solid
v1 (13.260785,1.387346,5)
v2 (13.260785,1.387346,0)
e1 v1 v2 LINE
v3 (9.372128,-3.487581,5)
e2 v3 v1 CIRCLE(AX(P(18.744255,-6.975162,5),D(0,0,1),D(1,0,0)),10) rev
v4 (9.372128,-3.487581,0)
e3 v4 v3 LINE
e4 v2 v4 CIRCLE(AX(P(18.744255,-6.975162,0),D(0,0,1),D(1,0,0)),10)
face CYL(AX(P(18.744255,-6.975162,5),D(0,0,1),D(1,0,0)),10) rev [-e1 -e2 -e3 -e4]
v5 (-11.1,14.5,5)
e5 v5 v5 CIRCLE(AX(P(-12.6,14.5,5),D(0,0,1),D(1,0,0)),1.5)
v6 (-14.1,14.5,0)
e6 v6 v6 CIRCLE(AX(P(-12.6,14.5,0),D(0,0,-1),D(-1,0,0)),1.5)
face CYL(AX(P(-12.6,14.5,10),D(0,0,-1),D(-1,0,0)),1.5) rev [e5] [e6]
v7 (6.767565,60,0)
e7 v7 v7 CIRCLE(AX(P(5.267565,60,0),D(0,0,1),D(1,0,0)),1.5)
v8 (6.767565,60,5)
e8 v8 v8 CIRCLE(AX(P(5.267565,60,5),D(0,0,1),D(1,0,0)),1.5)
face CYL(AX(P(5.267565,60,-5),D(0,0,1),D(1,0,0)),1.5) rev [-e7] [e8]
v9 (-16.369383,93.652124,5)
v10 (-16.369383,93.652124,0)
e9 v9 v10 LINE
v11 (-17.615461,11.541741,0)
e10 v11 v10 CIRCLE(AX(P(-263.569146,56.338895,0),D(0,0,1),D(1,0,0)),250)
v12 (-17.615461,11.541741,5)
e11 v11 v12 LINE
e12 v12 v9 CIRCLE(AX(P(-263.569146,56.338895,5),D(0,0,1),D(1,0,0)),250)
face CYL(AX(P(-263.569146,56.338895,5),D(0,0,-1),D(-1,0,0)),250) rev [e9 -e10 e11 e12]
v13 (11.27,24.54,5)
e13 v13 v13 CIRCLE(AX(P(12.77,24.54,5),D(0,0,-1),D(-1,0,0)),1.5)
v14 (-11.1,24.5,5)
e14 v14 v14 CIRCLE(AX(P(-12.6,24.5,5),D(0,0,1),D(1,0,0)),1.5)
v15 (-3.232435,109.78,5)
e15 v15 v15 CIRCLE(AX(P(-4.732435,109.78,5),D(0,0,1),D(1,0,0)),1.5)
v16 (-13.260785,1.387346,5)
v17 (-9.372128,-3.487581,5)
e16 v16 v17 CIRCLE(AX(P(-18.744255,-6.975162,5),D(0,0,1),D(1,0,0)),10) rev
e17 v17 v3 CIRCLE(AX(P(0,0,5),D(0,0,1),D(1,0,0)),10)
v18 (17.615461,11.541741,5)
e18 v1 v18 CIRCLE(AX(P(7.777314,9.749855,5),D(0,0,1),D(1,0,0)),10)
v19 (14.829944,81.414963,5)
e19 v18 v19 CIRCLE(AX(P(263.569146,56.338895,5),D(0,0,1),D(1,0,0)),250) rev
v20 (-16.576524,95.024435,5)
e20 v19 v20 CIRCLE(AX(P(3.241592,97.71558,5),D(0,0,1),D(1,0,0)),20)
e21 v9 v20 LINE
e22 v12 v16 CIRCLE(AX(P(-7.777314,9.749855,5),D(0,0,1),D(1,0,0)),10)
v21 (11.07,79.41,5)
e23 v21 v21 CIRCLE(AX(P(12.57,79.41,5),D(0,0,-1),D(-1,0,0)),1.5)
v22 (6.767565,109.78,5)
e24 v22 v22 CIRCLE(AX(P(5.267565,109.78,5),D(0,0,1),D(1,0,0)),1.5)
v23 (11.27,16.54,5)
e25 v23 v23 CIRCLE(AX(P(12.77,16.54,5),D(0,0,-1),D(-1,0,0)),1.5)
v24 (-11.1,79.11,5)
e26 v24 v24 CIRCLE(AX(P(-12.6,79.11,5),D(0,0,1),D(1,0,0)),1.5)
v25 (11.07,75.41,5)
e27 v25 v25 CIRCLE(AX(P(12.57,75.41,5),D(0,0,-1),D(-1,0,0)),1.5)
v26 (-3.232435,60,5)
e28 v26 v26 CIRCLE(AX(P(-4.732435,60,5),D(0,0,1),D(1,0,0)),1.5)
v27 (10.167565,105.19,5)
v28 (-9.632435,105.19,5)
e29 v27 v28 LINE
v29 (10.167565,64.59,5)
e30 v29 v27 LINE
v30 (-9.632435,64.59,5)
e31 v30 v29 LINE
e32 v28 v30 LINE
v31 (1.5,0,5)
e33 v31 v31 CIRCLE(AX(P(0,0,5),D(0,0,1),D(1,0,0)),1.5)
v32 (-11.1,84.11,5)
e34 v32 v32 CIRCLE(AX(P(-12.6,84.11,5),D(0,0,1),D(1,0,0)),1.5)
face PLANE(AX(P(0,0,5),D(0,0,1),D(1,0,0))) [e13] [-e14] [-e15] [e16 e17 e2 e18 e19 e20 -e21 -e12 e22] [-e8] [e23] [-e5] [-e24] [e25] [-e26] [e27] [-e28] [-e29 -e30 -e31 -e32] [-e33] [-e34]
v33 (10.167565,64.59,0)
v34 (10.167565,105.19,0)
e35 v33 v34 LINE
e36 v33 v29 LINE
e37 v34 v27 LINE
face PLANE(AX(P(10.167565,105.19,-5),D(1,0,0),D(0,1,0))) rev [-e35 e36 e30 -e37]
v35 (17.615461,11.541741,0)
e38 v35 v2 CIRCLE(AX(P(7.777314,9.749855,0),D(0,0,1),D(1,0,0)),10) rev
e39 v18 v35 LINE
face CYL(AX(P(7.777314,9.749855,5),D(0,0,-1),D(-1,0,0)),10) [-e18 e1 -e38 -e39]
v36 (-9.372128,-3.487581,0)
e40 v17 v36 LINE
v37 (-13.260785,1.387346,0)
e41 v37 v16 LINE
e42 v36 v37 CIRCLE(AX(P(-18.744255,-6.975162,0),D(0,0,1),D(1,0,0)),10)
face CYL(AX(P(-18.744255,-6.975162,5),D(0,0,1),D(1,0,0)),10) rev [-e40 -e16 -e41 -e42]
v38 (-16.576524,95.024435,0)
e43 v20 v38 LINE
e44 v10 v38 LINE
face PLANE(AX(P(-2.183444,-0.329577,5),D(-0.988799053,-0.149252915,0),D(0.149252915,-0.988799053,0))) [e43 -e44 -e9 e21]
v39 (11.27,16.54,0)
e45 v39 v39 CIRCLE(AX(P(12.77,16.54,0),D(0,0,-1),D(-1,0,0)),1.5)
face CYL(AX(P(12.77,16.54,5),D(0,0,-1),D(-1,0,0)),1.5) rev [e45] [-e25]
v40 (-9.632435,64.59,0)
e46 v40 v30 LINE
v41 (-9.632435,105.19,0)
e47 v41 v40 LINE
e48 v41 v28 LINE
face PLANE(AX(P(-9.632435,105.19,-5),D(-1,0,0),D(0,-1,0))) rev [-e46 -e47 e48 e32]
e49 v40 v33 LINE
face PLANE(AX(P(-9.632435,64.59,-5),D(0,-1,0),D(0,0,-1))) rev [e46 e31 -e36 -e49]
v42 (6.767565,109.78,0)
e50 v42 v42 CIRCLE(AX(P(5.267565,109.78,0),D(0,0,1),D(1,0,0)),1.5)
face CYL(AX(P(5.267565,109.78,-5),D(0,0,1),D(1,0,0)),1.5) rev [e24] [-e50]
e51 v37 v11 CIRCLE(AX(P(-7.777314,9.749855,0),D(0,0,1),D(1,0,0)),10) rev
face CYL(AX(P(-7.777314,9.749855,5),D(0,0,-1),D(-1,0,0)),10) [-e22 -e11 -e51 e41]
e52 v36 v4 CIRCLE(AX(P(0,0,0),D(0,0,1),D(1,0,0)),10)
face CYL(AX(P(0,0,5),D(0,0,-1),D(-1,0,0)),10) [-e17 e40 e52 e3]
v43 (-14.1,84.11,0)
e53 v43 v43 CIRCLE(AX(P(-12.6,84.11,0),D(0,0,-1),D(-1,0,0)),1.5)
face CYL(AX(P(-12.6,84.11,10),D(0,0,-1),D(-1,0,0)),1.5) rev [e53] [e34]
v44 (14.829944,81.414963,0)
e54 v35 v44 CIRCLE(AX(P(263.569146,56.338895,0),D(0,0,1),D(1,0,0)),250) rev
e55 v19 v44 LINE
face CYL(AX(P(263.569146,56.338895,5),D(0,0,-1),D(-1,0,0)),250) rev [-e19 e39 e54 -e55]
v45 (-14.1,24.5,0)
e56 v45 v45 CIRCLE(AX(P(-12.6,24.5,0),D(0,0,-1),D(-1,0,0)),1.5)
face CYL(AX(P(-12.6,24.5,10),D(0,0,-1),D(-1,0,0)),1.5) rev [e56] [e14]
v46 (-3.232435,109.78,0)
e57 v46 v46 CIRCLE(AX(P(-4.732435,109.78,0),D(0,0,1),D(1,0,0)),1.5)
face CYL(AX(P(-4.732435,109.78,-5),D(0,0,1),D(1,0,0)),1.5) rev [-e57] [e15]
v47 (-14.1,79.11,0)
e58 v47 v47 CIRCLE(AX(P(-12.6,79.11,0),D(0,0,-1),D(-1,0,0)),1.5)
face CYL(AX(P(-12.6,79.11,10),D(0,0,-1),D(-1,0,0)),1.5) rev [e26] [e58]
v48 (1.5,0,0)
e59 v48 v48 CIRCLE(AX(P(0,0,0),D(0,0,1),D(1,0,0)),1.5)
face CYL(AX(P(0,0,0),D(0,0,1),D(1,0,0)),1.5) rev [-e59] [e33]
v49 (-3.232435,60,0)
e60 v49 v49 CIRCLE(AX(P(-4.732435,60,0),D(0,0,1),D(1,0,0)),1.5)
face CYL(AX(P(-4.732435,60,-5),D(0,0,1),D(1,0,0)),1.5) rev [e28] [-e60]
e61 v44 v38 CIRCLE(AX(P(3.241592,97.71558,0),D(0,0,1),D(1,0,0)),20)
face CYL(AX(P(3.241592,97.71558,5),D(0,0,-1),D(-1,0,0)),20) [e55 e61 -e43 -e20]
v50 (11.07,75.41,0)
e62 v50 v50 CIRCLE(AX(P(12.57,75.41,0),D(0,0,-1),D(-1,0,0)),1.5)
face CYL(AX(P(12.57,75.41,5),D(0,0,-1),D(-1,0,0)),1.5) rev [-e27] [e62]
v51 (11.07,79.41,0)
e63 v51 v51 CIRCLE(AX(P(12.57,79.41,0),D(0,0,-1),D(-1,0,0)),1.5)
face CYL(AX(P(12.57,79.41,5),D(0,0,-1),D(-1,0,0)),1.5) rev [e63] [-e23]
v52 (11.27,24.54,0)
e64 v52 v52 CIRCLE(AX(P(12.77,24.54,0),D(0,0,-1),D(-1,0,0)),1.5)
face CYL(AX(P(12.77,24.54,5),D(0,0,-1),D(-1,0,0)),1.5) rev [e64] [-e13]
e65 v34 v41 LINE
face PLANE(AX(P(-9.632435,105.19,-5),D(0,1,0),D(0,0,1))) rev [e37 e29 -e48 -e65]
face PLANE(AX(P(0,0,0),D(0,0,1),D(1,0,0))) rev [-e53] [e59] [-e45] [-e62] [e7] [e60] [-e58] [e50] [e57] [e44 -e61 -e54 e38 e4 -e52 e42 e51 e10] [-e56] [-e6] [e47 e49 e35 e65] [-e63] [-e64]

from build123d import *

# Parameters (mm, degrees)
RESSALTO_EXTRUS_O1_DEPTH = 5
FILETE3_R                = 10
FILETE4_R                = 10
ESBO_O2_R                = 1.5
CORTE_EXTRUS_O1_DEPTH    = 5
ESBO_O4_R                = 1.5
CORTE_EXTRUS_O3_DEPTH    = 10
ESBO_O5_W                = 19.8
ESBO_O5_H                = 40.6
CORTE_EXTRUS_O4_DEPTH    = 10
ESBO_O6_R                = 1.5
CORTE_EXTRUS_O5_DEPTH    = 10
ESBO_O7_R                = 1.5
CORTE_EXTRUS_O6_DEPTH    = 121.092170275


with BuildPart() as part:
    # Esboço1 → Ressalto-extrusão1 (new body)
    with BuildSketch(Plane.XY):
        with BuildLine():
            ThreePointArc((-10, 0), (0, -10), (10, 0))
            Line((10, 0), (20, 0))
            ThreePointArc((20, 0), (14.071698091, 40.495175194), (14.829943665, 81.414963086))
            ThreePointArc((14.829943665, 81.414963086), (11.193742071, 116.066691762), (-16.576524471, 95.024435265))
            Line((-16.576524471, 95.024435265), (-16.487894969, 94.437265709))
            Line((-16.487894969, 94.437265709), (-16.369382775, 93.652123615))
            ThreePointArc((-16.369382775, 93.652123615), (-13.756795166, 46.654405302), (-20, 0))
            Line((-20, 0), (-10, 0))
        make_face()
    extrude(amount=RESSALTO_EXTRUS_O1_DEPTH)

    # Filete3
    # the kernel refuses this fillet: 10 mm, written as the material it takes off along each edge
    with BuildSketch(Plane(origin=(20, 0, -29.463728433), x_dir=(-0.20232831186330175, 0.9793177493635794, 0), z_dir=(0, 0, 1))) as filete3_piece_1:
        with BuildLine():
            CenterArc((12.021201201, 9.997221658), FILETE3_R, 181.169168083, 87.480189)
            Line((2.023283119, 9.793177494), (1.823324757, 9.78909661))
            ThreePointArc((1.823324757, 9.78909661), (0.815778009, 4.937054409), (-0.19586355, 0.040465662))
            Line((-0.19586355, 0.040465662), (0.004714197, -0.199944433))
            ThreePointArc((0.004714197, -0.199944433), (5.892745687, -0.130541448), (11.780777177, -0.199944433))
            Line((11.780777177, -0.199944433), (11.785491373, 0))
        make_face()
    extrude(amount=63.927456867, mode=Mode.SUBTRACT)
    with BuildSketch(Plane(origin=(-20, 0, -29.463728433), x_dir=(1, 0, 0), z_dir=(0, 0, 1))) as filete3_piece_2:
        with BuildLine():
            CenterArc((12.222685959, 9.749854723), FILETE3_R, 169.67749742, 87.480189)
            Line((2.384538574, 11.541740887), (2.187775626, 11.57757861))
            ThreePointArc((2.187775626, 11.57757861), (1.06442773, 5.797282674), (-0.194855317, 0.045071116))
            Line((-0.194855317, 0.045071116), (0, -0.2))
            ThreePointArc((0, -0.2), (5, -0.2), (9.955546281, -0.194997094))
            Line((9.955546281, -0.194997094), (10, 0))
        make_face()
    extrude(amount=63.927456867, mode=Mode.SUBTRACT)

    # Filete4
    filete4_edges = [part.edges().sort_by_distance(p)[0] for p in [
        (10, 0, 2.5),
        (-10, 0, 2.5),
    ]]
    fillet(filete4_edges, radius=FILETE4_R)

    # Esboço2 → Corte-extrusão1 (cut)
    with BuildSketch(Plane.XY.offset(5)):
        Circle(ESBO_O2_R)
    extrude(amount=-CORTE_EXTRUS_O1_DEPTH, mode=Mode.SUBTRACT)

    # Esboço4 → Corte-extrusão3 (cut)
    with BuildSketch(Plane.XY.offset(5)):
        with Locations((-4.732435028, 109.78)):
            Circle(ESBO_O4_R)
        with Locations((5.267564972, 109.78)):
            Circle(ESBO_O4_R)
        with Locations((-4.732435028, 60)):
            Circle(ESBO_O4_R)
        with Locations((5.267564972, 60)):
            Circle(ESBO_O4_R)
    extrude(amount=-CORTE_EXTRUS_O3_DEPTH, mode=Mode.SUBTRACT)

    # Esboço5 → Corte-extrusão4 (cut)
    with BuildSketch(Plane.XY.offset(5)):
        with Locations((0.267564972, 84.89)):
            Rectangle(ESBO_O5_W, ESBO_O5_H)
    extrude(amount=-CORTE_EXTRUS_O4_DEPTH, mode=Mode.SUBTRACT)

    # Esboço6 → Corte-extrusão5 (cut)
    with BuildSketch(Plane(origin=(0, 0, 0), x_dir=(-1, 0, 0), z_dir=(0, 0, -1))):
        with Locations((12.6, 14.5)):
            Circle(ESBO_O6_R)
        with Locations((12.6, 24.5)):
            Circle(ESBO_O6_R)
        with Locations((12.6, 79.11)):
            Circle(ESBO_O6_R)
        with Locations((12.6, 84.11)):
            Circle(ESBO_O6_R)
    extrude(amount=-CORTE_EXTRUS_O5_DEPTH, mode=Mode.SUBTRACT)

    # Esboço7 → Corte-extrusão6 (cut, through all)
    with BuildSketch(Plane(origin=(0, 0, 0), x_dir=(-1, 0, 0), z_dir=(0, 0, -1))):
        with Locations((-12.77, 16.54)):
            Circle(ESBO_O7_R)
        with Locations((-12.77, 24.54)):
            Circle(ESBO_O7_R)
        with Locations((-12.57, 75.41)):
            Circle(ESBO_O7_R)
        with Locations((-12.57, 79.41)):
            Circle(ESBO_O7_R)
    extrude(amount=-CORTE_EXTRUS_O6_DEPTH, mode=Mode.SUBTRACT)


solid = part.part
